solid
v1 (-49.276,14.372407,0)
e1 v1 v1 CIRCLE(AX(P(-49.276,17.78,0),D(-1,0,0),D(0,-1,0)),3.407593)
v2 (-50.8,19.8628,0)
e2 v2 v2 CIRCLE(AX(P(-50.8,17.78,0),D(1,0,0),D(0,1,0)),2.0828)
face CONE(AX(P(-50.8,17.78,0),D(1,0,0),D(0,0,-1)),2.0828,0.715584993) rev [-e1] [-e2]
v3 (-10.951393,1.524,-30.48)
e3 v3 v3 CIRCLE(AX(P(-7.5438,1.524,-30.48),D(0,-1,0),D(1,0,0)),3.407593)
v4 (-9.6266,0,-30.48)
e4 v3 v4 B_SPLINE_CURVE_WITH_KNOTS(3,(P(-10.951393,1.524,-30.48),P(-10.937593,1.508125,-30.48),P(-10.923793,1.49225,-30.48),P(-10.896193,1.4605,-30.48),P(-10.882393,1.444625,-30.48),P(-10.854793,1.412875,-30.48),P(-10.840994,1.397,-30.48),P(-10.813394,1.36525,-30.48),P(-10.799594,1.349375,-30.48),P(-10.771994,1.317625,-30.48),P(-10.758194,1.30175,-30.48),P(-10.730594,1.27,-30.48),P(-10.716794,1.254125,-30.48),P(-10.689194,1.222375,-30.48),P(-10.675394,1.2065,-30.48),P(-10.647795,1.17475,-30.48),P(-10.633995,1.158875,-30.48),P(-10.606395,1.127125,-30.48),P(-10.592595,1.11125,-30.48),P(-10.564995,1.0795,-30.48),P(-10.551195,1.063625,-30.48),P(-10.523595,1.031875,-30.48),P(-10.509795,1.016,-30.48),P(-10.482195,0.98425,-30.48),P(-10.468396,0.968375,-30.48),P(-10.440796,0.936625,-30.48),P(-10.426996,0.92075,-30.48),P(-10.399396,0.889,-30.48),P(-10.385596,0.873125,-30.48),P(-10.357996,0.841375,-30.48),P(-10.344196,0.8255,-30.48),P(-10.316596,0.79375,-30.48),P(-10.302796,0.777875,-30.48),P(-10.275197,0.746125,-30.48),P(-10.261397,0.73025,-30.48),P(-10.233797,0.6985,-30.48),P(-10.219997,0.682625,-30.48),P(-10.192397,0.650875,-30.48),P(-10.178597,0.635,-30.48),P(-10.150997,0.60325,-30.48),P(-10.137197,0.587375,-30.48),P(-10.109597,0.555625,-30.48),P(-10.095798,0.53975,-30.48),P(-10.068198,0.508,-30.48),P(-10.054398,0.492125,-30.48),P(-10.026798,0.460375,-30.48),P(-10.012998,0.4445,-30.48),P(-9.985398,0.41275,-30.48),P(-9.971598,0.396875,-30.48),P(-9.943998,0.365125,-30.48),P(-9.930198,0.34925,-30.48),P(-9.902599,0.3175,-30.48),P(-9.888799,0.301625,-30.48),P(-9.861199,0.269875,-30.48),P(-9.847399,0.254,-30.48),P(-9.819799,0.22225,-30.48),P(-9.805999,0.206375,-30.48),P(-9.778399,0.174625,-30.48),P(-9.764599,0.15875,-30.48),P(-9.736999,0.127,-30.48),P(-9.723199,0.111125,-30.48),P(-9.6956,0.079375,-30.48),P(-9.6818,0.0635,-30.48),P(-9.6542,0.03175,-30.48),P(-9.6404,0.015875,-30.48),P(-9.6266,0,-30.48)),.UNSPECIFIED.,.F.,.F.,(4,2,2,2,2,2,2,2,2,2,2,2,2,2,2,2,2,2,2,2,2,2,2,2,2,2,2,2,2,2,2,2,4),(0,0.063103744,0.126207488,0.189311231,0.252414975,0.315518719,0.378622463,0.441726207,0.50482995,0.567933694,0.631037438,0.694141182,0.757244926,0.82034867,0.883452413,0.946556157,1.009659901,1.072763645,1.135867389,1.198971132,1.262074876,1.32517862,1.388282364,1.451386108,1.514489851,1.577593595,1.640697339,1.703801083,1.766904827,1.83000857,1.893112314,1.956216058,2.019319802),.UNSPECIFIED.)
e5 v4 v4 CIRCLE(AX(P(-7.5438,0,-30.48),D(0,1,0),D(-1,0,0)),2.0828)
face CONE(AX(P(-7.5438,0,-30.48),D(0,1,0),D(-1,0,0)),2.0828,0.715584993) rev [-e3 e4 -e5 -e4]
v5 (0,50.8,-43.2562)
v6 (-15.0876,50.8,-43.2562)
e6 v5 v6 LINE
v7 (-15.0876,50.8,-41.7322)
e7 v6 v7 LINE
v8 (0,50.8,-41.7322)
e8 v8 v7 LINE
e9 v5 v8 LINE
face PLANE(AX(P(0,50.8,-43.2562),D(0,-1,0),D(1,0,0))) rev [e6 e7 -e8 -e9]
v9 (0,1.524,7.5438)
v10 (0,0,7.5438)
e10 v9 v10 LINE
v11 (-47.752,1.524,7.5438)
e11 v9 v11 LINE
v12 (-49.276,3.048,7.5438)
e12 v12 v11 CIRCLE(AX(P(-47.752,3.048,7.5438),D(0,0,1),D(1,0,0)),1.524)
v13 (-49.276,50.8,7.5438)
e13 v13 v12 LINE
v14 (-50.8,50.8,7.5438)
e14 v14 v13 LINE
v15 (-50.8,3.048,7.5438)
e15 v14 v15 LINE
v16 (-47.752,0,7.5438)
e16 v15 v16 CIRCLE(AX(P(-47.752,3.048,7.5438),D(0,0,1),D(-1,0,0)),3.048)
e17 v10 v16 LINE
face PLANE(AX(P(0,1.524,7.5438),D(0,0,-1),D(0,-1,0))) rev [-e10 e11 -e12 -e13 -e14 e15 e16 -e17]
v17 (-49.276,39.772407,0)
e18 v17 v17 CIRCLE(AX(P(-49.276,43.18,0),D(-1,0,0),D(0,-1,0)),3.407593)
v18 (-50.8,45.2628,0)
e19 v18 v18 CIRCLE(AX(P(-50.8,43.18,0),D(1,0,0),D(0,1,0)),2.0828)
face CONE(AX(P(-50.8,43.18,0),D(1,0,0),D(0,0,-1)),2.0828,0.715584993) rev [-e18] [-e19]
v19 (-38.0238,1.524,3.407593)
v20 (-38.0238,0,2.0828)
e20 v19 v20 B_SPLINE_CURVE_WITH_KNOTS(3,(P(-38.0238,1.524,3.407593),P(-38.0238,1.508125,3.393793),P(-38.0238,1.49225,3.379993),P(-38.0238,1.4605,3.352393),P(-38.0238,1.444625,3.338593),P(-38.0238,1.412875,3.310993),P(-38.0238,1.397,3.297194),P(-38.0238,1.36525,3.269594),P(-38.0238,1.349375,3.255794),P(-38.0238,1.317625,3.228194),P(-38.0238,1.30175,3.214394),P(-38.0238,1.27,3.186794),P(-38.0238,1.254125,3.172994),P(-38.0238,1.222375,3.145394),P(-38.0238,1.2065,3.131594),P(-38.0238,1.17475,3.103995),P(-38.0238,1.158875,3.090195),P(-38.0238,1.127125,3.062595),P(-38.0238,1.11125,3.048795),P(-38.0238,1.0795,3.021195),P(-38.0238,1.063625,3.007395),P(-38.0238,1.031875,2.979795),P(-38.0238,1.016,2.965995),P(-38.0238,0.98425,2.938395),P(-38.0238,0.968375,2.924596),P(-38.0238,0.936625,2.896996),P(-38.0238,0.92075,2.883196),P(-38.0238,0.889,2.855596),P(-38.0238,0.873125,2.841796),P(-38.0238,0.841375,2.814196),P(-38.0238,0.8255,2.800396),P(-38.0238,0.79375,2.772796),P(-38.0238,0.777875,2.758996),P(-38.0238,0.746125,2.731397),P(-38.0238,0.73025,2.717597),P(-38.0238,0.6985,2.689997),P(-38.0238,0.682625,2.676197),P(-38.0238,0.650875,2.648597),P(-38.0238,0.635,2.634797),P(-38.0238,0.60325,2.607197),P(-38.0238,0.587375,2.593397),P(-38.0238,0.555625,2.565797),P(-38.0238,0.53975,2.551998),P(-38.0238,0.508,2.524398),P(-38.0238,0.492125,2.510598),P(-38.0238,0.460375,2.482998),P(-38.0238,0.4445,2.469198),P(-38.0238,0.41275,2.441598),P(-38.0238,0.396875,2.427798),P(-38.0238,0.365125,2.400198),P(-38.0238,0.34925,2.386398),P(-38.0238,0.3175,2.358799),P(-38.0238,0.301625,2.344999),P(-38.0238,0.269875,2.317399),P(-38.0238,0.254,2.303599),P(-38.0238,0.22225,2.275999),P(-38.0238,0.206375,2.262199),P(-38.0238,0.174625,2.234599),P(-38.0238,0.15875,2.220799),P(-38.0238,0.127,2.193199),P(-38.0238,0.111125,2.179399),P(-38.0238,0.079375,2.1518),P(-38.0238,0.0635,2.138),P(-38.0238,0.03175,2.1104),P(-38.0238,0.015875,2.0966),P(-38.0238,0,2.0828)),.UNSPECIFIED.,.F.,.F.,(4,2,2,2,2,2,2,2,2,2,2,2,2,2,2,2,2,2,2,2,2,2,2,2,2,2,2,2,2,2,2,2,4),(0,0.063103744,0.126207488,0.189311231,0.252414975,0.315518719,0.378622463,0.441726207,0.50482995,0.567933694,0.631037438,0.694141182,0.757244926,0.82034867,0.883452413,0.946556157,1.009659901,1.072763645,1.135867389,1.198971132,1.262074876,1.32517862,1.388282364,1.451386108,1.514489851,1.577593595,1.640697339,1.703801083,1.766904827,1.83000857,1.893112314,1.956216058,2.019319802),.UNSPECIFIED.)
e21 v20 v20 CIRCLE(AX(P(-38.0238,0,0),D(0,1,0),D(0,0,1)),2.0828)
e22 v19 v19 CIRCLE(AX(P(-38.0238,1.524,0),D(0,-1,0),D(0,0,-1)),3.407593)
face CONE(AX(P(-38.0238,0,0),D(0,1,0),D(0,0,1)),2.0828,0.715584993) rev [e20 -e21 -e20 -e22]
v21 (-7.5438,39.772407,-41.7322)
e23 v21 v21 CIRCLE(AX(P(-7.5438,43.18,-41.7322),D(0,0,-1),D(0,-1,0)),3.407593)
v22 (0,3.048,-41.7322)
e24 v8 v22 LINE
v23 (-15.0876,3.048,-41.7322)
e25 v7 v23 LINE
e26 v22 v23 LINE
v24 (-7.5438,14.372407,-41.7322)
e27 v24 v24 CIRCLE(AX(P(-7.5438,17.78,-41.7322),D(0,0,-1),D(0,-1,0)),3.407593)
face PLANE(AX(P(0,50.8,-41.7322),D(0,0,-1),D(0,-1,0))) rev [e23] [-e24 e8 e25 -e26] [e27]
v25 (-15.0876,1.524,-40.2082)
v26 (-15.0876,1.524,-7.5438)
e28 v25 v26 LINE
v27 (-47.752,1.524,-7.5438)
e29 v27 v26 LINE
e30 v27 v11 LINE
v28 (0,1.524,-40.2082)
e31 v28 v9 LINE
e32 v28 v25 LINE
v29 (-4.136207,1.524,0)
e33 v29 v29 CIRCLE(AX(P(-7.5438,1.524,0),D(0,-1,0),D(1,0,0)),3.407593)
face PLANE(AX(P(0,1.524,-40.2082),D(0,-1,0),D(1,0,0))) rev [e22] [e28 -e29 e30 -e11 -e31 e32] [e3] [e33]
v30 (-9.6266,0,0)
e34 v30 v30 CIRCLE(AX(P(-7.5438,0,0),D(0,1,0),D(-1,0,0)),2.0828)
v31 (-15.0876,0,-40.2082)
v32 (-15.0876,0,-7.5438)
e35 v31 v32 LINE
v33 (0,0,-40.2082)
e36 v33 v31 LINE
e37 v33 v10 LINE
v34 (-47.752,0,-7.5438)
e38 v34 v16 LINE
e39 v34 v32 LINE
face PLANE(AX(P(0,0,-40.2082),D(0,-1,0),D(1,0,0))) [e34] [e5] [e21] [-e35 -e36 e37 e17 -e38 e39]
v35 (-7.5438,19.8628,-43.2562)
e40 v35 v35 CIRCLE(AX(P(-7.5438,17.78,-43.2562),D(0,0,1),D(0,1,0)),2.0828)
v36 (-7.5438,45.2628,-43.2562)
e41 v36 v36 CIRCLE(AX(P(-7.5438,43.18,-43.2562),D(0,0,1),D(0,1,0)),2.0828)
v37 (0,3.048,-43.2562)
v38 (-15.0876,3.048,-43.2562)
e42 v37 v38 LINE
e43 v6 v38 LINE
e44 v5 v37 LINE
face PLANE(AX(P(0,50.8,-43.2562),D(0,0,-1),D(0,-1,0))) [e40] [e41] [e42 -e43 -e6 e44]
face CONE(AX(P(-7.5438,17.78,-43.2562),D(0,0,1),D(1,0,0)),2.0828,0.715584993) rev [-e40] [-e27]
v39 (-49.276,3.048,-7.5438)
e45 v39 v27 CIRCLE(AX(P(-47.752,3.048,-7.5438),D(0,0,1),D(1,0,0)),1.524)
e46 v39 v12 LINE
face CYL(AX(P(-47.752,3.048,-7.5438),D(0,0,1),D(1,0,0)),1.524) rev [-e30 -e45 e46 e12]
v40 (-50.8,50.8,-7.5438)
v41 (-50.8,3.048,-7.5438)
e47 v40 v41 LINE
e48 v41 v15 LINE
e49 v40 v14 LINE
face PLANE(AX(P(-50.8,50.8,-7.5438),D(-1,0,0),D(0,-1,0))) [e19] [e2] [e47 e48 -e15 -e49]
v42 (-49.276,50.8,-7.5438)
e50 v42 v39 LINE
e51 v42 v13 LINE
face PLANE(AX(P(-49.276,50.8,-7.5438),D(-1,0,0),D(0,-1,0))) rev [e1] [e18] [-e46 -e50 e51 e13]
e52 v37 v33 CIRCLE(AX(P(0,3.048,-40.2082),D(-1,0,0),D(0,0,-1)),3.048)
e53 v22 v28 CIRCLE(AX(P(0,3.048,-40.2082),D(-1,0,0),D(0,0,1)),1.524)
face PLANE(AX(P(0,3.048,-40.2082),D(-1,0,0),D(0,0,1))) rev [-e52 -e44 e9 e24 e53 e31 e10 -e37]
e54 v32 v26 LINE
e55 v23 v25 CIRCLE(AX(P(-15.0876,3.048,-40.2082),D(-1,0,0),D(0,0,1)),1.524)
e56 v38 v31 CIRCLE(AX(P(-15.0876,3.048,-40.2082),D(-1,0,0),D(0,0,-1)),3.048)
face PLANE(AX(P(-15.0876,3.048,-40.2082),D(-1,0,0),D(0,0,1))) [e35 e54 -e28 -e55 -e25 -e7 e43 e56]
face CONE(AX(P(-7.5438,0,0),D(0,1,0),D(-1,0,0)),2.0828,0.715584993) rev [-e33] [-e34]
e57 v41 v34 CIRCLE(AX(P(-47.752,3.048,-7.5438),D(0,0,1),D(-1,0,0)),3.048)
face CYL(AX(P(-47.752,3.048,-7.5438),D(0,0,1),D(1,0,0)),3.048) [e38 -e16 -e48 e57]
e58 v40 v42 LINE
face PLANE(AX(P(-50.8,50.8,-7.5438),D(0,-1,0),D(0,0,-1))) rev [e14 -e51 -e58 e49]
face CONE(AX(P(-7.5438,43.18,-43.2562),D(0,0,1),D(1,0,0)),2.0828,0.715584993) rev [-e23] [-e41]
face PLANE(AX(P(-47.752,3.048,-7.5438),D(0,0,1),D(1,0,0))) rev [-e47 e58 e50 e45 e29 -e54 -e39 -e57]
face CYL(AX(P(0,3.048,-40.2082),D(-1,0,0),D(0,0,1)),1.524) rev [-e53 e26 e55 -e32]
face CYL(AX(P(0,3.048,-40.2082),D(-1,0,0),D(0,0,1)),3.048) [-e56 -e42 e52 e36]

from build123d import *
from OCP.BRepFilletAPI import BRepFilletAPI_MakeChamfer

# Parameters (mm, degrees)
EXTRUDE_THIN1_DEPTH = 7.5438
SKETCH4_R           = 2.0828
CUT_EXTRUDE1_DEPTH  = 72.173542096
SKETCH5_R           = 2.0828
CUT_EXTRUDE2_DEPTH  = 72.173542096
CHAMFER1_SIZE       = 1.324792988
CHAMFER1_SIZE_2     = 1.524
CIRPATTERN1_COUNT   = 2
CIRPATTERN1_ANGLE   = 90


with BuildPart() as part:
    # Sketch1 → Extrude-Thin1 (new, symmetric)
    with BuildSketch(Plane.XY):
        with BuildLine():
            Line((-50.8, 50.8), (-50.8, 3.048))
            ThreePointArc((-50.8, 3.048), (-49.907261469, 0.892738531), (-47.752, 0))
            Line((-47.752, 0), (0, 0))
            Line((0, 0), (0, 1.524))
            Line((0, 1.524), (-47.752, 1.524))
            ThreePointArc((-47.752, 1.524), (-48.829630735, 1.970369265), (-49.276, 3.048))
            Line((-49.276, 3.048), (-49.276, 50.8))
            Line((-49.276, 50.8), (-50.8, 50.8))
        make_face()
    extrude(amount=EXTRUDE_THIN1_DEPTH, both=True)

    # Sketch4 → Cut-Extrude1 (cut, through all)
    with BuildSketch(Plane(origin=(0, 1.524, 0), x_dir=(1, 0, 0), z_dir=(0, 1, 0))):
        with Locations(Location((-7.5438, 0, 0), (0, 0, 270))):
            Circle(SKETCH4_R)
        with Locations(Location((-38.0238, 0, 0), (0, 0, 270))):
            Circle(SKETCH4_R)
    extrude(amount=-CUT_EXTRUDE1_DEPTH, mode=Mode.SUBTRACT)

    # Sketch5 → Cut-Extrude2 (cut, through all)
    with BuildSketch(Plane(origin=(-49.276, 0, 0), x_dir=(0, 0, -1), z_dir=(1, 0, 0))):
        with Locations(Location((0, 43.18, 0), (0, 0, 90))):
            Circle(SKETCH5_R)
        with Locations(Location((0, 17.78, 0), (0, 0, 90))):
            Circle(SKETCH5_R)
    extrude(amount=-CUT_EXTRUDE2_DEPTH, mode=Mode.SUBTRACT)

    # Chamfer1
    chamfer1_edges_1 = [part.edges().sort_by_distance(p)[0] for p in [
        (-7.5438, 1.524, -2.0828),
    ]]
    chamfer1_side_1 = [part.faces().sort_by_distance(p)[0] for p in [
        (-7.5438, 1.524, -2.10929586),
    ]]
    chamfer1_edges_2 = [part.edges().sort_by_distance(p)[0] for p in [
        (-38.0238, 1.524, -2.0828),
    ]]
    chamfer1_side_2 = [part.faces().sort_by_distance(p)[0] for p in [
        (-38.0238, 1.524, -2.10929586),
    ]]
    chamfer1_edges_3 = [part.edges().sort_by_distance(p)[0] for p in [
        (-49.276, 41.0972, 0),
    ]]
    chamfer1_side_3 = [part.faces().sort_by_distance(p)[0] for p in [
        (-49.276, 41.07070414, 0),
    ]]
    chamfer1_edges_4 = [part.edges().sort_by_distance(p)[0] for p in [
        (-49.276, 15.6972, 0),
    ]]
    chamfer1_side_4 = [part.faces().sort_by_distance(p)[0] for p in [
        (-49.276, 15.67070414, 0),
    ]]
    chamfer1 = BRepFilletAPI_MakeChamfer(part.part.solid().wrapped)
    for e in chamfer1_edges_1:
        chamfer1.Add(CHAMFER1_SIZE - 0.0001, CHAMFER1_SIZE_2 - 0.0001, e.wrapped, chamfer1_side_1[0].wrapped)
    for e in chamfer1_edges_2:
        chamfer1.Add(CHAMFER1_SIZE - 0.0001, CHAMFER1_SIZE_2 - 0.0001, e.wrapped, chamfer1_side_2[0].wrapped)
    for e in chamfer1_edges_3:
        chamfer1.Add(CHAMFER1_SIZE - 0.0001, CHAMFER1_SIZE_2 - 0.0001, e.wrapped, chamfer1_side_3[0].wrapped)
    for e in chamfer1_edges_4:
        chamfer1.Add(CHAMFER1_SIZE - 0.0001, CHAMFER1_SIZE_2 - 0.0001, e.wrapped, chamfer1_side_4[0].wrapped)
    add(Compound.cast(chamfer1.Shape()), mode=Mode.REPLACE)  # a hair under: the kernel refuses the full size


with BuildPart() as cirpattern1_1:
    # CirPattern1: pattern copy
    add(part.part.rotate(Axis((-7.5438, 0, 0), (0, -1, 0)), 1 * CIRPATTERN1_ANGLE / (CIRPATTERN1_COUNT - 1)))

    # Combine1: union part
    add(part.part)


solid = cirpattern1_1.part
